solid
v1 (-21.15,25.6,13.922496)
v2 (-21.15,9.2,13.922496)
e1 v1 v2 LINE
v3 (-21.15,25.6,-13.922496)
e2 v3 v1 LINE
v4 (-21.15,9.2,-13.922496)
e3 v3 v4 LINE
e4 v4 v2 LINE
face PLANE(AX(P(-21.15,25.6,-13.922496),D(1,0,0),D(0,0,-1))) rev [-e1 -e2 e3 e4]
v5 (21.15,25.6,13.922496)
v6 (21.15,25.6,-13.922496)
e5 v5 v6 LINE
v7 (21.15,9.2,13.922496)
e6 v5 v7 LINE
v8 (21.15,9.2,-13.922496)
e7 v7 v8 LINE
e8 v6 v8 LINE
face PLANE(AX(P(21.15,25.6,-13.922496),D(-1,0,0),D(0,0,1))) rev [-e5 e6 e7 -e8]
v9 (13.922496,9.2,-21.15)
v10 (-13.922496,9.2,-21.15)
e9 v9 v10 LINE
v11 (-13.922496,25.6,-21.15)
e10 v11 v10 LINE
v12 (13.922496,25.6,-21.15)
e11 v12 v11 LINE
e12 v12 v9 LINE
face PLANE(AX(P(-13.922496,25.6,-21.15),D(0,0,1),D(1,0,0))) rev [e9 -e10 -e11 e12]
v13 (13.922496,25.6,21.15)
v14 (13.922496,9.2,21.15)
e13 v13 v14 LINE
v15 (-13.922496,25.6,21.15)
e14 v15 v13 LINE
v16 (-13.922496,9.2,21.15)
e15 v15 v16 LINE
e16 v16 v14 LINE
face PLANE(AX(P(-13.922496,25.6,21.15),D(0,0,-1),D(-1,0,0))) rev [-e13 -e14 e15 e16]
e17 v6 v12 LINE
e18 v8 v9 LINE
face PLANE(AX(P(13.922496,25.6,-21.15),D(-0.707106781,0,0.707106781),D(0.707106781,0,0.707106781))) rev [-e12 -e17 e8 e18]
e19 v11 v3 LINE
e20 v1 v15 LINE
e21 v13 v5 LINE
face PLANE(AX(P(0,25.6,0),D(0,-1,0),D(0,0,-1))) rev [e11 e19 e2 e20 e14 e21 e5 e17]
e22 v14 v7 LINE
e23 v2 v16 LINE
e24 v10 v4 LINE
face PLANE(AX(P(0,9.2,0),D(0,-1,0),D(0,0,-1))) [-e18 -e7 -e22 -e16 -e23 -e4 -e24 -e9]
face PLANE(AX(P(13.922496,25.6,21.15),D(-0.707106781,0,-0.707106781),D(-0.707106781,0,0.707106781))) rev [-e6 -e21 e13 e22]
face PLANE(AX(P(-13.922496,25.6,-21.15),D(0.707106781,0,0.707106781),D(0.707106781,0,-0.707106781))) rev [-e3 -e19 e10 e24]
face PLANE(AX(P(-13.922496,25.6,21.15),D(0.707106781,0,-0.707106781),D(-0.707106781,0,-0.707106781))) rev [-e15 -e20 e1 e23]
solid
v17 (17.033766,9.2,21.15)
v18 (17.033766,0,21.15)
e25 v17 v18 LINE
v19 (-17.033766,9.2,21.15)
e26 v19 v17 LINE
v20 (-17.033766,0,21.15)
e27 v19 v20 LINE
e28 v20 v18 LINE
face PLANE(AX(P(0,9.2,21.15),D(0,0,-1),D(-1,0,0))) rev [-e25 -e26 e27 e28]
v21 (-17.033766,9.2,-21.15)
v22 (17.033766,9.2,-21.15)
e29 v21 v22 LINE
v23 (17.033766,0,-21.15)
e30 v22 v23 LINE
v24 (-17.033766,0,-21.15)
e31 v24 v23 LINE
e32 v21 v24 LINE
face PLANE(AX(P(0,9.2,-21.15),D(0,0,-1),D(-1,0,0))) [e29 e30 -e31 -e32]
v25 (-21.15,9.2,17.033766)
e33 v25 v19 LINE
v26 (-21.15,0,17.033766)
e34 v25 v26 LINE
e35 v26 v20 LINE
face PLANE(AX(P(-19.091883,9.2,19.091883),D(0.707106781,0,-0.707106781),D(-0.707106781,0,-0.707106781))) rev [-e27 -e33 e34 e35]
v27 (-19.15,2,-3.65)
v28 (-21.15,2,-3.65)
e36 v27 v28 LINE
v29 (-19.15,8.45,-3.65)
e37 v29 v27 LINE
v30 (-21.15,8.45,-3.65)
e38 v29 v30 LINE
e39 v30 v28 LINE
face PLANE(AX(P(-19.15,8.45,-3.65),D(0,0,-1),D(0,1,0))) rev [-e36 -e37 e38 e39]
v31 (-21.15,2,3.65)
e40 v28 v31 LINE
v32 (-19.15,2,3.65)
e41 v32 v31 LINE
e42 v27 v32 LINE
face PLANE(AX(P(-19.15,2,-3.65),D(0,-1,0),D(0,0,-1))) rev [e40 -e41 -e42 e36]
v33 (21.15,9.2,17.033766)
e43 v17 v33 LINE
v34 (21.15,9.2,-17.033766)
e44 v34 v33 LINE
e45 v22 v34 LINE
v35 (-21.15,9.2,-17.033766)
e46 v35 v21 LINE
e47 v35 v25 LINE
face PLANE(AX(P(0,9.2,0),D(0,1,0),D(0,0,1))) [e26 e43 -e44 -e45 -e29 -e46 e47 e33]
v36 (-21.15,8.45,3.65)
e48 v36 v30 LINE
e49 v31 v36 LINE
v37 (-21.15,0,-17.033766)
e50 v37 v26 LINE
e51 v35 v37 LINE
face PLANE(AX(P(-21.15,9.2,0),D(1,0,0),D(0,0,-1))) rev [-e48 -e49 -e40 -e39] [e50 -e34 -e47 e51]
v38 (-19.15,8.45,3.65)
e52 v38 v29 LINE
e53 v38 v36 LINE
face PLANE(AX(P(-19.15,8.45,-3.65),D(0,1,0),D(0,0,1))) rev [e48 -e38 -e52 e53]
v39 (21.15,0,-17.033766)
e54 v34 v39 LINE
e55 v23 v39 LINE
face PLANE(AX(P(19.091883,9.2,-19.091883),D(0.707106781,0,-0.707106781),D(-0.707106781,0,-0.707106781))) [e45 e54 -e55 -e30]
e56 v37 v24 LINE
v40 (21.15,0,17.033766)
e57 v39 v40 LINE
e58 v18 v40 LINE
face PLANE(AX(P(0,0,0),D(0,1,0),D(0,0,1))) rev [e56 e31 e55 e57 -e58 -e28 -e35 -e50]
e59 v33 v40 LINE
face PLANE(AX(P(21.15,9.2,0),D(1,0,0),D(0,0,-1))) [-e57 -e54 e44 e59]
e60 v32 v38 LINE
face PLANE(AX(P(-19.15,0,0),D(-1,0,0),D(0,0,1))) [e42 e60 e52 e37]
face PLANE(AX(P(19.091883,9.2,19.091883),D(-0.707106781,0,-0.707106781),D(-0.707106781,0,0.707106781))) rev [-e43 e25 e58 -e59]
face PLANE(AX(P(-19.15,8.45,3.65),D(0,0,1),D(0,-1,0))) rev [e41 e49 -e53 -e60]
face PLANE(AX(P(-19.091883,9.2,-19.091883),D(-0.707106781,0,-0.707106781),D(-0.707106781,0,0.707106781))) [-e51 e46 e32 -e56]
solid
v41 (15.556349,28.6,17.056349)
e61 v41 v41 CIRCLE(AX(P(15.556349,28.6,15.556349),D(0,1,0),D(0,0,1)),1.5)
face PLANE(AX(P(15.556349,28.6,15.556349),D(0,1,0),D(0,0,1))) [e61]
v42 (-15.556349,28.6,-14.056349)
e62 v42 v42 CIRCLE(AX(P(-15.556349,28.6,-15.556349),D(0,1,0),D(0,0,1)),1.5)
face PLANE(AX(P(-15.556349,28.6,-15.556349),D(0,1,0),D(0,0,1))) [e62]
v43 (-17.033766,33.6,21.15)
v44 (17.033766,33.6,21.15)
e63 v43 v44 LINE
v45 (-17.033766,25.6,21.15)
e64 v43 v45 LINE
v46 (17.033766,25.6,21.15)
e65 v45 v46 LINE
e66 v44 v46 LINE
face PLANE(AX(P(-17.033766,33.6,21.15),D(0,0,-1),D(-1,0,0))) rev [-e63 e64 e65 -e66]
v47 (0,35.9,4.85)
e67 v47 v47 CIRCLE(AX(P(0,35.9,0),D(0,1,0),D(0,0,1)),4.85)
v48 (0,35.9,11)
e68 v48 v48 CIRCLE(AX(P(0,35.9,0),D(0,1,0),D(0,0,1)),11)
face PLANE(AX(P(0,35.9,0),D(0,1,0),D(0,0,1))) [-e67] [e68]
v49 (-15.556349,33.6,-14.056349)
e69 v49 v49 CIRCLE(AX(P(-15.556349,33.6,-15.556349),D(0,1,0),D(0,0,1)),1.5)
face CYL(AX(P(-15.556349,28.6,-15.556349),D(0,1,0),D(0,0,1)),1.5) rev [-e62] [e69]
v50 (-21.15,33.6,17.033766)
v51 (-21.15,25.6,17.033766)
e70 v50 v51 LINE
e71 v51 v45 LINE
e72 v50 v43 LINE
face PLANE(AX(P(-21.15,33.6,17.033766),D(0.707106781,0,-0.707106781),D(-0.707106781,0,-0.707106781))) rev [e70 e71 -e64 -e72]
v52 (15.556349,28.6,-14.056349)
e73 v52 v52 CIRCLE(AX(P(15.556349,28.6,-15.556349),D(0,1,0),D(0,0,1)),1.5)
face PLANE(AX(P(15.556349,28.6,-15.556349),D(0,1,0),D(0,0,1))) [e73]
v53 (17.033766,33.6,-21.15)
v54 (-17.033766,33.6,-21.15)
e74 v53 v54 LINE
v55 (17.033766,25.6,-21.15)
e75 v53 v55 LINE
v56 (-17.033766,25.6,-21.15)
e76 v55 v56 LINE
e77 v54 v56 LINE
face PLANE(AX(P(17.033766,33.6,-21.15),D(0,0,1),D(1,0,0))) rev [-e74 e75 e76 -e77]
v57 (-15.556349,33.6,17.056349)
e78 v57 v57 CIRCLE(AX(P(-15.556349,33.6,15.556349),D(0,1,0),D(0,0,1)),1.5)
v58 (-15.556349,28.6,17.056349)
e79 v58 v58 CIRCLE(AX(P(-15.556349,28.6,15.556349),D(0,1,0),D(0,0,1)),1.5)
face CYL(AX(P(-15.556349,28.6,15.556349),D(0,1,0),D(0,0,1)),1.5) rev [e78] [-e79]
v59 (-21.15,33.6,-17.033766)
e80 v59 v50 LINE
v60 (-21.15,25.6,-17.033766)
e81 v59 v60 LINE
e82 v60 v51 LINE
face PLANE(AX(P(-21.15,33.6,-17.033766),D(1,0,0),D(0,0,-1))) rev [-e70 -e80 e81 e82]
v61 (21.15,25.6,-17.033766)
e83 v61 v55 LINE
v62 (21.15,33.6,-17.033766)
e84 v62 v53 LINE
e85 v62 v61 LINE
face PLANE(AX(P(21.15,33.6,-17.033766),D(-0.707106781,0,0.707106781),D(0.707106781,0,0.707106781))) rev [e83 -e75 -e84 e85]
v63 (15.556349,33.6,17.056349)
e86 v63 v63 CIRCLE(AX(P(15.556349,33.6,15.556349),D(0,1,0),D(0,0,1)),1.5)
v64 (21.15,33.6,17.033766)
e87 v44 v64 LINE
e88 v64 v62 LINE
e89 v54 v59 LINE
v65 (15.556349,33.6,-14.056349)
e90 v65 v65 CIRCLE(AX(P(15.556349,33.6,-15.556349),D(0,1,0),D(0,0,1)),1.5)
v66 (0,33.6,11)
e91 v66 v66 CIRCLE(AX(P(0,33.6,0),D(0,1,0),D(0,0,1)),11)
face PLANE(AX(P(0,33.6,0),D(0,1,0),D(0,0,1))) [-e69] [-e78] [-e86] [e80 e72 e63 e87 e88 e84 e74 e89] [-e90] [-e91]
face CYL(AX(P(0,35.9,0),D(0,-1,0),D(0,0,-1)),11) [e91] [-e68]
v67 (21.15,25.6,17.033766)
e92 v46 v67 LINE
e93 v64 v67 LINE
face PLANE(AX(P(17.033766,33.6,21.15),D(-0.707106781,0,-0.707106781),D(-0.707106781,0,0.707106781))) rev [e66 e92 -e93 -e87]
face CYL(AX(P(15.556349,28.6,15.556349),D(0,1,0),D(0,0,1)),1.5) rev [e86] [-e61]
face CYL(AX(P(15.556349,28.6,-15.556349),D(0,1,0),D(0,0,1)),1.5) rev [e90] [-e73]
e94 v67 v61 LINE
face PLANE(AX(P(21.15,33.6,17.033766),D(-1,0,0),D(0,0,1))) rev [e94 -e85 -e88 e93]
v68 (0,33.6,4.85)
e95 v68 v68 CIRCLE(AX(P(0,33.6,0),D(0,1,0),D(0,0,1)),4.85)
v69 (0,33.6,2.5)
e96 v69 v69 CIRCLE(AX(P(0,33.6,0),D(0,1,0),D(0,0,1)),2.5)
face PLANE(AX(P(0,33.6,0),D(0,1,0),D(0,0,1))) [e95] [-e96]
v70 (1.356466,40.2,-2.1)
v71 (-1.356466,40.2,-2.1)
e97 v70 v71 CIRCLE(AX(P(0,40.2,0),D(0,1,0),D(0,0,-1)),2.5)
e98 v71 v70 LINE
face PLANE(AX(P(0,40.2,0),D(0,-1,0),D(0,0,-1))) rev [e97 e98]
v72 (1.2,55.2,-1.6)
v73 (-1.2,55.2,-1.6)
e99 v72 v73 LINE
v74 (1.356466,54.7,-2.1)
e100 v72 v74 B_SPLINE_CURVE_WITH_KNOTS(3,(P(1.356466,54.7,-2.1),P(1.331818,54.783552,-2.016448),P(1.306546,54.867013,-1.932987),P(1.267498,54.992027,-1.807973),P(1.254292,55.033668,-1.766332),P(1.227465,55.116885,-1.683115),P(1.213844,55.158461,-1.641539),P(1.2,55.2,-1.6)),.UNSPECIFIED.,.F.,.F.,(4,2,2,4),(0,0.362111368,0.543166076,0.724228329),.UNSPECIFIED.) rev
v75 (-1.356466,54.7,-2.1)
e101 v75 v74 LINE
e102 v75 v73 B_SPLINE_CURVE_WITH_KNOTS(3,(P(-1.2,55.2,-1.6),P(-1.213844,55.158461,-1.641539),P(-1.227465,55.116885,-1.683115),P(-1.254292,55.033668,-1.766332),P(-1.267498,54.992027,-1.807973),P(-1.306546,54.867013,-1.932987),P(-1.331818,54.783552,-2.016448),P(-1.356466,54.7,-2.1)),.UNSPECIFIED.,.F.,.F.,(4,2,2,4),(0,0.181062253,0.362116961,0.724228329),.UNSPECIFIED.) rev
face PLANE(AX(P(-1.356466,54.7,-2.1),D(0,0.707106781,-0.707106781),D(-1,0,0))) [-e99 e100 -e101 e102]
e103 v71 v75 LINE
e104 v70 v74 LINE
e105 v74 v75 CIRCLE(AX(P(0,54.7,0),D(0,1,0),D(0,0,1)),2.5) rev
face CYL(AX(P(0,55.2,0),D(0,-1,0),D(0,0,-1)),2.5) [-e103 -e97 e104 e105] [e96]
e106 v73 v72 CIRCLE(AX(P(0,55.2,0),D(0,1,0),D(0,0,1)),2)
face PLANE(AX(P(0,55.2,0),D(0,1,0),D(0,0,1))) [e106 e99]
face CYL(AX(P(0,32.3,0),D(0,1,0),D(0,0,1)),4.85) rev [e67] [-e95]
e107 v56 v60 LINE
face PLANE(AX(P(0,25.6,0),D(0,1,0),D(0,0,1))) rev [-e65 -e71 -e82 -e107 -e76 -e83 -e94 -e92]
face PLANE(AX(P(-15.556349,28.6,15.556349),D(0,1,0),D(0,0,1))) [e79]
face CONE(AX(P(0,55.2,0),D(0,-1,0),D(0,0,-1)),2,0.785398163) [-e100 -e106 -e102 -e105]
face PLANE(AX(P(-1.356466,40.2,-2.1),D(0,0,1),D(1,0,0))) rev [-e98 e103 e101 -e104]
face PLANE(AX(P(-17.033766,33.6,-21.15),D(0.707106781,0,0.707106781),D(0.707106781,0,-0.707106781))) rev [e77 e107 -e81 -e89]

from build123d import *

# Parameters (mm, degrees)
BOTTOMBASE_DEPTH            = 9.2
MIDDLEBASE_DEPTH            = 16.4
TOPBASE_DEPTH               = 8
SKETCH4_R                   = 1.5
MOUNTINGHOLES_DEPTH         = 5
SKETCH5_R                   = 11
RINGAROUNDAXEL_DEPTH        = 2.3
SKETCH6_R                   = 4.85
INNERCUTOUTAROUNDAXEL_DEPTH = 3.6
SKETCH9_W                   = 7.3
SKETCH9_H                   = 6.45
WIRES_2_DEPTH               = 2
SKETCH10_R                  = 2.5
AXEL_DEPTH                  = 21.6
FLATFACEOFAXEL_DEPTH        = 15
CHAMFER1_SIZE               = 0.5


with BuildPart() as part:
    # Sketch1 → BottomBase (new body)
    with BuildSketch(Plane(origin=(0, 0, 0), x_dir=(1, 0, 0), z_dir=(0, 1, 0))):
        Polygon((-17.033766184, 21.15), (-21.15, 17.033766184), (-21.15, -17.033766184), (-17.033766184, -21.15), (17.033766184, -21.15), (21.15, -17.033766184), (21.15, 17.033766184), (17.033766184, 21.15), align=None)
    extrude(amount=BOTTOMBASE_DEPTH)

    # Sketch9 → Wires 2 (cut)
    with BuildSketch(Plane.ZY.offset(21.15)):
        with Locations((0, 5.225)):
            Rectangle(SKETCH9_W, SKETCH9_H)
    extrude(amount=-WIRES_2_DEPTH, mode=Mode.SUBTRACT)


with BuildPart() as body_2:
    # Sketch2 → MiddleBase (new body)
    with BuildSketch(Plane(origin=(0, 9.2, 0), x_dir=(1, 0, 0), z_dir=(0, 1, 0))):
        Polygon((13.922496347, -21.15), (21.15, -13.922496347), (21.15, 13.922496347), (13.922496347, 21.15), (-13.922496347, 21.15), (-21.15, 13.922496347), (-21.15, -13.922496347), (-13.922496347, -21.15), align=None)
    extrude(amount=MIDDLEBASE_DEPTH)


with BuildPart() as body_3:
    # Sketch3 → TopBase (new body)
    with BuildSketch(Plane(origin=(0, 25.6, 0), x_dir=(1, 0, 0), z_dir=(0, 1, 0))):
        Polygon((21.15, 17.033766184), (17.033766184, 21.15), (-17.033766184, 21.15), (-21.15, 17.033766184), (-21.15, -17.033766184), (-17.033766184, -21.15), (17.033766184, -21.15), (21.15, -17.033766184), align=None)
    extrude(amount=TOPBASE_DEPTH)

    # Sketch4 → MountingHoles (cut)
    with BuildSketch(Plane(origin=(0, 33.6, 0), x_dir=(1, 0, 0), z_dir=(0, 1, 0))):
        with Locations(Location((15.556349186, 15.556349186, 0), (0, 0, 270))):
            Circle(SKETCH4_R)
        with Locations(Location((15.556349186, -15.556349186, 0), (0, 0, 270))):
            Circle(SKETCH4_R)
        with Locations(Location((-15.556349186, -15.556349186, 0), (0, 0, 270))):
            Circle(SKETCH4_R)
        with Locations(Location((-15.556349186, 15.556349186, 0), (0, 0, 270))):
            Circle(SKETCH4_R)
    extrude(amount=-MOUNTINGHOLES_DEPTH, mode=Mode.SUBTRACT)



with BuildPart() as body_4:
    # Sketch5 → RingAroundAxel (new body)
    with BuildSketch(Plane(origin=(0, 33.6, 0), x_dir=(1, 0, 0), z_dir=(0, 1, 0))):
        with Locations(Location((0, 0, 0), (0, 0, 270))):
            Circle(SKETCH5_R)
    extrude(amount=RINGAROUNDAXEL_DEPTH)

    # Sketch6 → InnerCutoutAroundAxel (cut)
    with BuildSketch(Plane(origin=(0, 35.9, 0), x_dir=(1, 0, 0), z_dir=(0, 1, 0))):
        with Locations(Location((0, 0, 0), (0, 0, 270))):
            Circle(SKETCH6_R)
    extrude(amount=-INNERCUTOUTAROUNDAXEL_DEPTH, mode=Mode.SUBTRACT)


with BuildPart() as body_3_1:
    add(body_3.part)

    add(body_4.part)  # Axel merges body 4
    # Sketch10 → Axel (add)
    with BuildSketch(Plane(origin=(0, 33.6, 0), x_dir=(1, 0, 0), z_dir=(0, 1, 0))):
        with Locations(Location((0, 0, 0), (0, 0, 90))):
            Circle(SKETCH10_R)
    extrude(amount=AXEL_DEPTH)

    # Sketch11 → FlatFaceOfAxel (cut)
    with BuildSketch(Plane(origin=(0, 55.2, 0), x_dir=(1, 0, 0), z_dir=(0, 1, 0))):
        with BuildLine():
            Line((-1.356465997, 2.1), (1.356465997, 2.1))
            ThreePointArc((1.356465997, 2.1), (0, 2.5), (-1.356465997, 2.1))
        make_face()
    extrude(amount=-FLATFACEOFAXEL_DEPTH, mode=Mode.SUBTRACT)

    # Chamfer1
    # the kernel refuses this chamfer: 0.5 mm, written as the material it takes off along each edge
    with BuildSketch(Plane(origin=(0, 55.2, 0), x_dir=(-0.05693067670621247, 0, -0.9983781337999009), z_dir=(0.9983781337999009, 0, -0.05693067670621247))) as chamfer1_piece_1:
        Polygon((2.5, -CHAMFER1_SIZE), (2.5 - CHAMFER1_SIZE, 0), (2.5, 0), align=None)
    revolve(axis=Axis((0, 55.2, 0), (0, 1, 0)), revolution_arc=353.472695813, mode=Mode.SUBTRACT)
    with BuildSketch(Plane(origin=(-2.642307491, 55.2, -2.1), x_dir=(0, -0.9996219169112968, -0.027495876610586605), z_dir=(1, 0, 0))) as chamfer1_piece_2:
        Polygon((CHAMFER1_SIZE * 0.999621916911, -CHAMFER1_SIZE * 0.0274958766106), (-CHAMFER1_SIZE * 0.0274958766106, -CHAMFER1_SIZE * 0.999621916911), (0, 0), align=None)
    extrude(amount=5.284614981, mode=Mode.SUBTRACT)


solid = Compound([part.part, body_2.part, body_3_1.part])
